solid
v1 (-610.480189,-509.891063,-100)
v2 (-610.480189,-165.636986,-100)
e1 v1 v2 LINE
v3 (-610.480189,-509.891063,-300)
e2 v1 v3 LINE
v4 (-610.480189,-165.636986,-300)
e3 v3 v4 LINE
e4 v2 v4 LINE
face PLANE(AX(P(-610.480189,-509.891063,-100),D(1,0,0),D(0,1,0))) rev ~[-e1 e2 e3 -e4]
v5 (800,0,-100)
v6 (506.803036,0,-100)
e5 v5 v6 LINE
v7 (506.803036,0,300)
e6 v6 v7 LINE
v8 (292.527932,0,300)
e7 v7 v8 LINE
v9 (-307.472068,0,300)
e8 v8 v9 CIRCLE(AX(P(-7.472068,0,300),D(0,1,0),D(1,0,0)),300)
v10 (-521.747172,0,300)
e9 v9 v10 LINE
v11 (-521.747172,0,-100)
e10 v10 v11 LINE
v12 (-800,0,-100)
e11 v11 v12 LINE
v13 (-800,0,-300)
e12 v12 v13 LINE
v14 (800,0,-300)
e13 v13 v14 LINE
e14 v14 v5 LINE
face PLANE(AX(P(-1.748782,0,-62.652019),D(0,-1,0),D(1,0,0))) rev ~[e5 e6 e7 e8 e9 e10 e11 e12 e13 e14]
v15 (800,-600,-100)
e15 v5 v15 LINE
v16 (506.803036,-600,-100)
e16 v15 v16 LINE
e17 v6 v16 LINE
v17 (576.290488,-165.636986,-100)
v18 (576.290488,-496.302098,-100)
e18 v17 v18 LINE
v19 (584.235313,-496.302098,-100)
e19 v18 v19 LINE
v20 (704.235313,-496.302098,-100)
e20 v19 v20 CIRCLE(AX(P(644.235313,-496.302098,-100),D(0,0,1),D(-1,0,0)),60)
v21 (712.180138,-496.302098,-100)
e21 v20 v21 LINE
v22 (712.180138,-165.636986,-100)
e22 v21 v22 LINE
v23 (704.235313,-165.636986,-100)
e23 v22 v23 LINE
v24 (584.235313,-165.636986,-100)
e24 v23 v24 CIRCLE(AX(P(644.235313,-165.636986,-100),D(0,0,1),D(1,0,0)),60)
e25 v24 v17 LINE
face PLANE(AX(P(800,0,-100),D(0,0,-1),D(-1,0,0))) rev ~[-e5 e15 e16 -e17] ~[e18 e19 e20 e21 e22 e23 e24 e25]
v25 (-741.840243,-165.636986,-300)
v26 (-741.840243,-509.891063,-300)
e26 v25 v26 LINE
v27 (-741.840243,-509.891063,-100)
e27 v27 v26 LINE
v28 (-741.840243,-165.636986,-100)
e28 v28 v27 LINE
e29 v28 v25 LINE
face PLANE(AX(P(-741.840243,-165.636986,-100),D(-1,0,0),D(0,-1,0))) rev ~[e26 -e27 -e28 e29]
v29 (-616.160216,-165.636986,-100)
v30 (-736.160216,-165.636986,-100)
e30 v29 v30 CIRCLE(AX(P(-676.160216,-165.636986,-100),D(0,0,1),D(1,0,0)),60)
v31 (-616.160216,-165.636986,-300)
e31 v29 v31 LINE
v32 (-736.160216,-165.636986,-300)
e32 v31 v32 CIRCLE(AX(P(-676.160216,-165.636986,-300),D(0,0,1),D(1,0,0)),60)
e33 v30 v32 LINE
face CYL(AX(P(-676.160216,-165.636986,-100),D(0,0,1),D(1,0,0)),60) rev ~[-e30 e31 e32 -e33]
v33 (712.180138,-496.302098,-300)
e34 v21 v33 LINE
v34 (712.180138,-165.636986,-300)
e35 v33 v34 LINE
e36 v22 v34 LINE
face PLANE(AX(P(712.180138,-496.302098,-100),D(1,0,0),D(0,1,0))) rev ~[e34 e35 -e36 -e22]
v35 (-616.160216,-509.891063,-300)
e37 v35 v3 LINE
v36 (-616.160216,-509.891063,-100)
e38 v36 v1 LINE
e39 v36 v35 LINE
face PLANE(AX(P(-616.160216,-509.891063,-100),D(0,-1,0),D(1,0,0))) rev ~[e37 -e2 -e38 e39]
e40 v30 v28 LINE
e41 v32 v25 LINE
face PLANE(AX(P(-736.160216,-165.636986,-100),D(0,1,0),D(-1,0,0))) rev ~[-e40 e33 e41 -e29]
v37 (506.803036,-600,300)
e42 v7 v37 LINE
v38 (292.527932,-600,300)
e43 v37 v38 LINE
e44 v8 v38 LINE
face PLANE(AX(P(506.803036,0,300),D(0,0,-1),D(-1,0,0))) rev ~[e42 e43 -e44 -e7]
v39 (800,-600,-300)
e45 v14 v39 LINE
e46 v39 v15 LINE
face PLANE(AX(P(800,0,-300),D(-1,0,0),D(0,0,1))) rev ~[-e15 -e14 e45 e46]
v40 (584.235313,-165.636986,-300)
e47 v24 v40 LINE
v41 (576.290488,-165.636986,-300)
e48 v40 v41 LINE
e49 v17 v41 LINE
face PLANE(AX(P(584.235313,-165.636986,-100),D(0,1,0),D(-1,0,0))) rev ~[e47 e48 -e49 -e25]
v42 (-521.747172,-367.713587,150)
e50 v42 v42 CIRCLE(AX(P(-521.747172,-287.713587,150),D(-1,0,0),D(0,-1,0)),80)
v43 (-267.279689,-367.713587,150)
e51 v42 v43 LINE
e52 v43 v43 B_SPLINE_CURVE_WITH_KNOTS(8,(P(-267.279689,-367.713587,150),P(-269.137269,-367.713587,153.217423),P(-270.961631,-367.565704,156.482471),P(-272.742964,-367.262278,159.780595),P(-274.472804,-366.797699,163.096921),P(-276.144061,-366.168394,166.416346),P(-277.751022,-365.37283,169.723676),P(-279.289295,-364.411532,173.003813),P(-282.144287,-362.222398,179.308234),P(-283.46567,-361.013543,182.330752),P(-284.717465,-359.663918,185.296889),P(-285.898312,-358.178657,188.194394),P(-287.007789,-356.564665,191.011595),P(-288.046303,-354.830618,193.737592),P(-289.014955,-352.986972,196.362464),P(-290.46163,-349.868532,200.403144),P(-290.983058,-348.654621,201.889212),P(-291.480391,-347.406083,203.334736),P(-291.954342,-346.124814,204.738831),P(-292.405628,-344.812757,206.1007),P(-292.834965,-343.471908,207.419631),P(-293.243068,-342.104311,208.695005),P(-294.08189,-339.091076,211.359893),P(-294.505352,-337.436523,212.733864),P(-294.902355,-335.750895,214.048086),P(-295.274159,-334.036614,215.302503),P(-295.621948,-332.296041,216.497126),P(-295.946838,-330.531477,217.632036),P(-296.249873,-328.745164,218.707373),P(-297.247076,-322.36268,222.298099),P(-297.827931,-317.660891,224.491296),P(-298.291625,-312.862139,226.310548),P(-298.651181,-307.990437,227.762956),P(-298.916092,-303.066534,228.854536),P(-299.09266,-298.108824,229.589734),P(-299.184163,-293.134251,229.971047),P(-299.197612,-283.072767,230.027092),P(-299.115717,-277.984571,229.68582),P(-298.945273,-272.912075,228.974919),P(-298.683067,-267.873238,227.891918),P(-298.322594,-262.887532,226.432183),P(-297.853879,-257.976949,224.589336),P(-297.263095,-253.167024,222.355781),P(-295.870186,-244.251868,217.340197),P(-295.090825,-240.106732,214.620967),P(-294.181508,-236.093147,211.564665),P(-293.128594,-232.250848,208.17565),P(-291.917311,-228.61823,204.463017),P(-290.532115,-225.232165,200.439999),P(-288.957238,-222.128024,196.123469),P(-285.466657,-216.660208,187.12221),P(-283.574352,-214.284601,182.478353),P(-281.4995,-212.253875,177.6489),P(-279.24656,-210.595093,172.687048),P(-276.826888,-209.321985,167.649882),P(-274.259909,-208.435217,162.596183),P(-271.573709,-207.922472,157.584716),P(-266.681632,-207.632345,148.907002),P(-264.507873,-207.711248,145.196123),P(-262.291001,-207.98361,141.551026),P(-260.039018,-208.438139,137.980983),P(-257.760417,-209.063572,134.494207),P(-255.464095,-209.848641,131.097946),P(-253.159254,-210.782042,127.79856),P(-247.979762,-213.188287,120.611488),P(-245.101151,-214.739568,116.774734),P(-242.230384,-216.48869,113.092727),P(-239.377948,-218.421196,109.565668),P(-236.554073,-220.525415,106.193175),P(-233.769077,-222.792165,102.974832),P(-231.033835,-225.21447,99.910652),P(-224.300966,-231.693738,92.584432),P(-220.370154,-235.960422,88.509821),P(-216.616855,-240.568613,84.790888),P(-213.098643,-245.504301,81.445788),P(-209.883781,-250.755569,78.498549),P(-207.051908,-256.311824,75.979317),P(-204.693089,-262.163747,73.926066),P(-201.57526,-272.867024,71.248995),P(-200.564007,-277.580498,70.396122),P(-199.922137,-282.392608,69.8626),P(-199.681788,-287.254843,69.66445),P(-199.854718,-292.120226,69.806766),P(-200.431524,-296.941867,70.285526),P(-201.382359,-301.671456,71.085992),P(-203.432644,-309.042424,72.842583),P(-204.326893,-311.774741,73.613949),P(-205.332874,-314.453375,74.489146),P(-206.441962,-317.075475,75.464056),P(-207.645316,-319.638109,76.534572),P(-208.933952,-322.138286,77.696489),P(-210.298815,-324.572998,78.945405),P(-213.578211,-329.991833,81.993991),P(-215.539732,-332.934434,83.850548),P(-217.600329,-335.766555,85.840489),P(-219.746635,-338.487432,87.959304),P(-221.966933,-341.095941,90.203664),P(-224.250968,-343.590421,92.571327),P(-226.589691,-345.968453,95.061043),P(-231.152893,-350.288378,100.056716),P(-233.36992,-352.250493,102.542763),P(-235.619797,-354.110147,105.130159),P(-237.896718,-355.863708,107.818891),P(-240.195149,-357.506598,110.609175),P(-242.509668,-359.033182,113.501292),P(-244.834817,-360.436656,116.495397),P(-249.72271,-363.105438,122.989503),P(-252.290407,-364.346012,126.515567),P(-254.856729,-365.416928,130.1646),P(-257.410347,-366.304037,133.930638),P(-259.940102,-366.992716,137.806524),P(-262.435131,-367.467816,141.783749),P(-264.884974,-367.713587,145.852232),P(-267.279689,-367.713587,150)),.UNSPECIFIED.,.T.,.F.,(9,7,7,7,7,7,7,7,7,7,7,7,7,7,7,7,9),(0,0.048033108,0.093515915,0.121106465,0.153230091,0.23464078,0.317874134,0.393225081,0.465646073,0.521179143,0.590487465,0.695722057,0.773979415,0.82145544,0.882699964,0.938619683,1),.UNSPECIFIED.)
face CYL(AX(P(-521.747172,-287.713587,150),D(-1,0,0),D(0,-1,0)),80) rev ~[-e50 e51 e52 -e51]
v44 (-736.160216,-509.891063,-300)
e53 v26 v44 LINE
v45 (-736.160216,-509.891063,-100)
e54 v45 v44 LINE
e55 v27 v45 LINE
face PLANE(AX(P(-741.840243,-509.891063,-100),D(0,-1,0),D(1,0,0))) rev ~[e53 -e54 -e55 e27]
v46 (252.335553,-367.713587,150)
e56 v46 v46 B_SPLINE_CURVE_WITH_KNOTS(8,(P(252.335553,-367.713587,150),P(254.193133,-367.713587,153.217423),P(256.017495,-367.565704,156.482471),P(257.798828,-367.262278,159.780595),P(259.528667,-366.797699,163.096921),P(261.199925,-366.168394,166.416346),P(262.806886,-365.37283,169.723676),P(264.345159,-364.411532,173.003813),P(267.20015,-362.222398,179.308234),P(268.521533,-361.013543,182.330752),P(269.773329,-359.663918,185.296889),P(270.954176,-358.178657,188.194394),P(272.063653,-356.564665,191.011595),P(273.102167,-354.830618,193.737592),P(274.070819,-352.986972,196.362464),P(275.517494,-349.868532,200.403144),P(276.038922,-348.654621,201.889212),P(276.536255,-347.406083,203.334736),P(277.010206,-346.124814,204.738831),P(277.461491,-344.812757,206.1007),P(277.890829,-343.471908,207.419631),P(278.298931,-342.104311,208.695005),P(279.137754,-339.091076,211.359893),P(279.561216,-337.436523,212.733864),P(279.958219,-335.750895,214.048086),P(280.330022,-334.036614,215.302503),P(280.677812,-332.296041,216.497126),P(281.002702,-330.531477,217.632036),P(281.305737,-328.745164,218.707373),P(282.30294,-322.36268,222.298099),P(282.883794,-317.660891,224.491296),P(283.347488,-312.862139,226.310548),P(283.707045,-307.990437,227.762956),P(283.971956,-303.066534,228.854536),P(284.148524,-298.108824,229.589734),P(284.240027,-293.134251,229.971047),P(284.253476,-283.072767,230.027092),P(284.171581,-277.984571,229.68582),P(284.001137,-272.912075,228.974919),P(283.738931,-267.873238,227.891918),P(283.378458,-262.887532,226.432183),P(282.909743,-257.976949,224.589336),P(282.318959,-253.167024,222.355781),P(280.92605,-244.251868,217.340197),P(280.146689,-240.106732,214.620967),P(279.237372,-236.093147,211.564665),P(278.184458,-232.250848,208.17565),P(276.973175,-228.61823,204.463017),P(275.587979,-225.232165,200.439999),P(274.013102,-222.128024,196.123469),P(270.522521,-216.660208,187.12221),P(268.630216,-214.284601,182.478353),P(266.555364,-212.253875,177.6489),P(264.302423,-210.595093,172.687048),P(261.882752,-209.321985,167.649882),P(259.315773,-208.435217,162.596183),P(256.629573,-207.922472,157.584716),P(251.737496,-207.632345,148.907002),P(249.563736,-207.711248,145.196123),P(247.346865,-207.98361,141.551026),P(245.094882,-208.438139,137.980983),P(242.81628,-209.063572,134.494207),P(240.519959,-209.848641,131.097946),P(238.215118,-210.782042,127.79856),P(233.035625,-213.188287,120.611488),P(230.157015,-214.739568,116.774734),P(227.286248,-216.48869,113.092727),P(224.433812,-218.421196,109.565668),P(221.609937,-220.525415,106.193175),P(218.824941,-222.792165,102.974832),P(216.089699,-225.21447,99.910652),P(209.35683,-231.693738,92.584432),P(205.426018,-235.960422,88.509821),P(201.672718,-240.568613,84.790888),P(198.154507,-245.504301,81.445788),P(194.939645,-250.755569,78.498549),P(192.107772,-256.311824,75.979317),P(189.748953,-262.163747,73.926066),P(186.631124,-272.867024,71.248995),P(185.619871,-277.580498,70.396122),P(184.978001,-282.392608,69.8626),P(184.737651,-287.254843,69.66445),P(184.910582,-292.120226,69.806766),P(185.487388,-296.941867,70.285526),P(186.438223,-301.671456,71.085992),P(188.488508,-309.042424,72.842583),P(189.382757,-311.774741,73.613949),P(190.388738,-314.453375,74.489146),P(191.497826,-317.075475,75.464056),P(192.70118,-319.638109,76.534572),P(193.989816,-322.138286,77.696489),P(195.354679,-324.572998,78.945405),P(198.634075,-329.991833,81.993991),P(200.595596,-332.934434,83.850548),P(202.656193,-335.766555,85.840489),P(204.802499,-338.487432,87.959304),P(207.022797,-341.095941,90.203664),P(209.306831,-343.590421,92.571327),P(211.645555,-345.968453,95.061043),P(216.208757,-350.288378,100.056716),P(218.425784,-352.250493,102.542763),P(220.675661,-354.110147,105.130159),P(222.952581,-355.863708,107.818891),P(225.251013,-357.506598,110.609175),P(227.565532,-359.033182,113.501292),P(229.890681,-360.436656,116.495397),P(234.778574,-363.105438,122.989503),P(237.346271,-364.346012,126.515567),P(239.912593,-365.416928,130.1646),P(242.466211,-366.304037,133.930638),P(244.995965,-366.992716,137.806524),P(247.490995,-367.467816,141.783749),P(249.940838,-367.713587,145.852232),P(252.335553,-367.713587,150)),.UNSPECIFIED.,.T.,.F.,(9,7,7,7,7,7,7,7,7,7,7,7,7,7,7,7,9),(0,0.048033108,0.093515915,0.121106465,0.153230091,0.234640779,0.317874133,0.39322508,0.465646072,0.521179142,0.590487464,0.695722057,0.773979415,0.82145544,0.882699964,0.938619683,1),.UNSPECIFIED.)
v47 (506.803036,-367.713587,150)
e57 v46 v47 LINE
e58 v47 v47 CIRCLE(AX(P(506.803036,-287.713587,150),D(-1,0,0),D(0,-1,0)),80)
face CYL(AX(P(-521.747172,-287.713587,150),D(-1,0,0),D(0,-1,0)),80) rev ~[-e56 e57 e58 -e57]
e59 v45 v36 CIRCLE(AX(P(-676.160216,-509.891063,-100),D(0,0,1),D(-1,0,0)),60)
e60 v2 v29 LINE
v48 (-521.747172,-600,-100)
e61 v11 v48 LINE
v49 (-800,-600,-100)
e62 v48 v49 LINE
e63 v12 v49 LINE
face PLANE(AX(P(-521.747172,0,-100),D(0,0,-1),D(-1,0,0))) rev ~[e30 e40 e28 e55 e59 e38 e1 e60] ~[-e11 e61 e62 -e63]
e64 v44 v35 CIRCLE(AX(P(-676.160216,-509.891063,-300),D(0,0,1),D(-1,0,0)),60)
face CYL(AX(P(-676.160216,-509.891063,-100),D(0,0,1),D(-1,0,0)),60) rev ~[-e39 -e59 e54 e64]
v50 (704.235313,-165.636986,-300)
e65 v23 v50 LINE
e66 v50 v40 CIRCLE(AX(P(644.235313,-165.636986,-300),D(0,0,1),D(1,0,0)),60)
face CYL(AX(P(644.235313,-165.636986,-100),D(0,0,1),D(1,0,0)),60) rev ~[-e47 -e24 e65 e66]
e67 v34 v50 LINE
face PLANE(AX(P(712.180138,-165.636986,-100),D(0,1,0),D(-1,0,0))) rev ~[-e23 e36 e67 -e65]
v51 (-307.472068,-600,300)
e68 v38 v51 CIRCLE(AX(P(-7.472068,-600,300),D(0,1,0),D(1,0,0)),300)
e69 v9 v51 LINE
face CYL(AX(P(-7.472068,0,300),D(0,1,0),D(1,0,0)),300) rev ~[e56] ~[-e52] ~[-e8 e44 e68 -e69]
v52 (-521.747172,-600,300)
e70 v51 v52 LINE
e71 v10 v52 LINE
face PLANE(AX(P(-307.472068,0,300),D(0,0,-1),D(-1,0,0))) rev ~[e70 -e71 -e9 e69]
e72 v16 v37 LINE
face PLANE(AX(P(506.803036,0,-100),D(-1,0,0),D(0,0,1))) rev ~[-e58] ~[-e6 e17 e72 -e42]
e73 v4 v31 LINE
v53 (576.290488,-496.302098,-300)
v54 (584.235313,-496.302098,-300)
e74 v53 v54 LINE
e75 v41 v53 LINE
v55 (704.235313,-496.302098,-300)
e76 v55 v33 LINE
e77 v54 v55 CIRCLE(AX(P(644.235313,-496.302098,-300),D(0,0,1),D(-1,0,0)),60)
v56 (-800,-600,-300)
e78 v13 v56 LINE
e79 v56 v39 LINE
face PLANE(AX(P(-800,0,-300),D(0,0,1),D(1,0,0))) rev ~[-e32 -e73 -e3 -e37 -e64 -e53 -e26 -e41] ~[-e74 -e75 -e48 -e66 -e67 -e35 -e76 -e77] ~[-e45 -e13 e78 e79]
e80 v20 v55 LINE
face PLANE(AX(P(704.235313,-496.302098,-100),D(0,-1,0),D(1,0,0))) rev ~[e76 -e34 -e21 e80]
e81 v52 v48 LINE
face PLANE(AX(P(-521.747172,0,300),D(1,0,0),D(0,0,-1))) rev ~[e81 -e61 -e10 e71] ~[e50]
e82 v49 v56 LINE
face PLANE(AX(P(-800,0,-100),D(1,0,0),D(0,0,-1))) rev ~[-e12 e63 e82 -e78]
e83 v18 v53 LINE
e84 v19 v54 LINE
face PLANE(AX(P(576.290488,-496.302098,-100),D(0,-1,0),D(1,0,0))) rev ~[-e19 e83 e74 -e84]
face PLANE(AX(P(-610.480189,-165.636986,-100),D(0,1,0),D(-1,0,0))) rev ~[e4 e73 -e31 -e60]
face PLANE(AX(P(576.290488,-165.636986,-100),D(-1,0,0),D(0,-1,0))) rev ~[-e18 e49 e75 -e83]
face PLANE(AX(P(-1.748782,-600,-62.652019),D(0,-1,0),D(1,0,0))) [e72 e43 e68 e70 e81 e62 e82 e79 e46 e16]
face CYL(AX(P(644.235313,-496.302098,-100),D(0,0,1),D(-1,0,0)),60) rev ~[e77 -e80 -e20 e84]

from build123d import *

# Parameters (mm, degrees)
F1_DEPTH = 600
F2_R     = 80
F3_DEPTH = 1321.7481718788
F5_DEPTH = 200.001
F6_DEPTH = 200.001


# Not quite as in the source:
# - a feature names something its author has since deleted; it is built from what else it names


with BuildPart() as f1:
    # F0 (on Front) → F1 (new body)
    with BuildSketch(Plane.XZ):
        with BuildLine():
            Line((506.8030357361, -100), (506.8030357361, 300))
            Line((506.8030357361, 300), (292.5279319286, 300))
            ThreePointArc((292.5279319286, 300), (-7.4720680714, 0), (-307.4720680714, 300))
            Line((-307.4720680714, 300), (-521.7471718788, 300))
            Line((-521.7471718788, 300), (-521.7471718788, -100))
            Line((-521.7471718788, -100), (-800, -100))
            Line((-800, -100), (-800, -300))
            Line((-800, -300), (800, -300))
            Line((800, -300), (800, -100))
            Line((800, -100), (506.8030357361, -100))
        make_face()
    extrude(amount=F1_DEPTH)

    # F2 (on face) → F3 (cut, through all)
    with BuildSketch(Plane(origin=(-521.7471718788, 0, 0), x_dir=(0, -1, 0), z_dir=(-1, 0, 0))):
        with Locations((287.7135872841, 150)):
            Circle(F2_R)
    extrude(amount=-F3_DEPTH, mode=Mode.SUBTRACT)

    # F4 (on face) → F5 (cut, through all)
    with BuildSketch(Plane.XY.offset(-100)):
        with BuildLine():
            Line((-610.4801893234, -509.8910629749), (-610.4801893234, -165.6369864941))
            Line((-610.4801893234, -165.6369864941), (-616.1602163315, -165.6369864941))
            ThreePointArc((-616.1602163315, -165.6369864941), (-676.1602163315, -105.6369864941), (-736.1602163315, -165.6369864941))
            Line((-736.1602163315, -165.6369864941), (-741.8402433395, -165.6369864941))
            Line((-741.8402433395, -165.6369864941), (-741.8402433395, -509.8910629749))
            Line((-741.8402433395, -509.8910629749), (-736.1602163315, -509.8910629749))
            ThreePointArc((-736.1602163315, -509.8910629749), (-676.1602163315, -569.8910629749), (-616.1602163315, -509.8910629749))
            Line((-616.1602163315, -509.8910629749), (-610.4801893234, -509.8910629749))
        make_face()
        with BuildLine():
            Line((704.2353129387, -496.3020980358), (712.1801376343, -496.3020980358))
            Line((712.1801376343, -496.3020980358), (712.1801376343, -165.6369864941))
            Line((712.1801376343, -165.6369864941), (704.2353129387, -165.6369864941))
            ThreePointArc((704.2353129387, -165.6369864941), (644.2353129387, -105.6369864941), (584.2353129387, -165.6369864941))
            Line((584.2353129387, -165.6369864941), (576.2904882431, -165.6369864941))
            Line((576.2904882431, -165.6369864941), (576.2904882431, -496.3020980358))
            Line((576.2904882431, -496.3020980358), (584.2353129387, -496.3020980358))
            ThreePointArc((584.2353129387, -496.3020980358), (644.2353129387, -556.3020980358), (704.2353129387, -496.3020980358))
        make_face()
    extrude(amount=-F5_DEPTH, mode=Mode.SUBTRACT)

    # F4 (on face) → F6 (cut, through all)
    with BuildSketch(Plane.XY.offset(-100)):
        with BuildLine():
            Line((-610.4801893234, -509.8910629749), (-610.4801893234, -165.6369864941))
            Line((-610.4801893234, -165.6369864941), (-616.1602163315, -165.6369864941))
            ThreePointArc((-616.1602163315, -165.6369864941), (-676.1602163315, -105.6369864941), (-736.1602163315, -165.6369864941))
            Line((-736.1602163315, -165.6369864941), (-741.8402433395, -165.6369864941))
            Line((-741.8402433395, -165.6369864941), (-741.8402433395, -509.8910629749))
            Line((-741.8402433395, -509.8910629749), (-736.1602163315, -509.8910629749))
            ThreePointArc((-736.1602163315, -509.8910629749), (-676.1602163315, -569.8910629749), (-616.1602163315, -509.8910629749))
            Line((-616.1602163315, -509.8910629749), (-610.4801893234, -509.8910629749))
        make_face()
        with BuildLine():
            Line((704.2353129387, -496.3020980358), (712.1801376343, -496.3020980358))
            Line((712.1801376343, -496.3020980358), (712.1801376343, -165.6369864941))
            Line((712.1801376343, -165.6369864941), (704.2353129387, -165.6369864941))
            ThreePointArc((704.2353129387, -165.6369864941), (644.2353129387, -105.6369864941), (584.2353129387, -165.6369864941))
            Line((584.2353129387, -165.6369864941), (576.2904882431, -165.6369864941))
            Line((576.2904882431, -165.6369864941), (576.2904882431, -496.3020980358))
            Line((576.2904882431, -496.3020980358), (584.2353129387, -496.3020980358))
            ThreePointArc((584.2353129387, -496.3020980358), (644.2353129387, -556.3020980358), (704.2353129387, -496.3020980358))
        make_face()
    extrude(amount=-F6_DEPTH, mode=Mode.SUBTRACT)


solid = f1.part
